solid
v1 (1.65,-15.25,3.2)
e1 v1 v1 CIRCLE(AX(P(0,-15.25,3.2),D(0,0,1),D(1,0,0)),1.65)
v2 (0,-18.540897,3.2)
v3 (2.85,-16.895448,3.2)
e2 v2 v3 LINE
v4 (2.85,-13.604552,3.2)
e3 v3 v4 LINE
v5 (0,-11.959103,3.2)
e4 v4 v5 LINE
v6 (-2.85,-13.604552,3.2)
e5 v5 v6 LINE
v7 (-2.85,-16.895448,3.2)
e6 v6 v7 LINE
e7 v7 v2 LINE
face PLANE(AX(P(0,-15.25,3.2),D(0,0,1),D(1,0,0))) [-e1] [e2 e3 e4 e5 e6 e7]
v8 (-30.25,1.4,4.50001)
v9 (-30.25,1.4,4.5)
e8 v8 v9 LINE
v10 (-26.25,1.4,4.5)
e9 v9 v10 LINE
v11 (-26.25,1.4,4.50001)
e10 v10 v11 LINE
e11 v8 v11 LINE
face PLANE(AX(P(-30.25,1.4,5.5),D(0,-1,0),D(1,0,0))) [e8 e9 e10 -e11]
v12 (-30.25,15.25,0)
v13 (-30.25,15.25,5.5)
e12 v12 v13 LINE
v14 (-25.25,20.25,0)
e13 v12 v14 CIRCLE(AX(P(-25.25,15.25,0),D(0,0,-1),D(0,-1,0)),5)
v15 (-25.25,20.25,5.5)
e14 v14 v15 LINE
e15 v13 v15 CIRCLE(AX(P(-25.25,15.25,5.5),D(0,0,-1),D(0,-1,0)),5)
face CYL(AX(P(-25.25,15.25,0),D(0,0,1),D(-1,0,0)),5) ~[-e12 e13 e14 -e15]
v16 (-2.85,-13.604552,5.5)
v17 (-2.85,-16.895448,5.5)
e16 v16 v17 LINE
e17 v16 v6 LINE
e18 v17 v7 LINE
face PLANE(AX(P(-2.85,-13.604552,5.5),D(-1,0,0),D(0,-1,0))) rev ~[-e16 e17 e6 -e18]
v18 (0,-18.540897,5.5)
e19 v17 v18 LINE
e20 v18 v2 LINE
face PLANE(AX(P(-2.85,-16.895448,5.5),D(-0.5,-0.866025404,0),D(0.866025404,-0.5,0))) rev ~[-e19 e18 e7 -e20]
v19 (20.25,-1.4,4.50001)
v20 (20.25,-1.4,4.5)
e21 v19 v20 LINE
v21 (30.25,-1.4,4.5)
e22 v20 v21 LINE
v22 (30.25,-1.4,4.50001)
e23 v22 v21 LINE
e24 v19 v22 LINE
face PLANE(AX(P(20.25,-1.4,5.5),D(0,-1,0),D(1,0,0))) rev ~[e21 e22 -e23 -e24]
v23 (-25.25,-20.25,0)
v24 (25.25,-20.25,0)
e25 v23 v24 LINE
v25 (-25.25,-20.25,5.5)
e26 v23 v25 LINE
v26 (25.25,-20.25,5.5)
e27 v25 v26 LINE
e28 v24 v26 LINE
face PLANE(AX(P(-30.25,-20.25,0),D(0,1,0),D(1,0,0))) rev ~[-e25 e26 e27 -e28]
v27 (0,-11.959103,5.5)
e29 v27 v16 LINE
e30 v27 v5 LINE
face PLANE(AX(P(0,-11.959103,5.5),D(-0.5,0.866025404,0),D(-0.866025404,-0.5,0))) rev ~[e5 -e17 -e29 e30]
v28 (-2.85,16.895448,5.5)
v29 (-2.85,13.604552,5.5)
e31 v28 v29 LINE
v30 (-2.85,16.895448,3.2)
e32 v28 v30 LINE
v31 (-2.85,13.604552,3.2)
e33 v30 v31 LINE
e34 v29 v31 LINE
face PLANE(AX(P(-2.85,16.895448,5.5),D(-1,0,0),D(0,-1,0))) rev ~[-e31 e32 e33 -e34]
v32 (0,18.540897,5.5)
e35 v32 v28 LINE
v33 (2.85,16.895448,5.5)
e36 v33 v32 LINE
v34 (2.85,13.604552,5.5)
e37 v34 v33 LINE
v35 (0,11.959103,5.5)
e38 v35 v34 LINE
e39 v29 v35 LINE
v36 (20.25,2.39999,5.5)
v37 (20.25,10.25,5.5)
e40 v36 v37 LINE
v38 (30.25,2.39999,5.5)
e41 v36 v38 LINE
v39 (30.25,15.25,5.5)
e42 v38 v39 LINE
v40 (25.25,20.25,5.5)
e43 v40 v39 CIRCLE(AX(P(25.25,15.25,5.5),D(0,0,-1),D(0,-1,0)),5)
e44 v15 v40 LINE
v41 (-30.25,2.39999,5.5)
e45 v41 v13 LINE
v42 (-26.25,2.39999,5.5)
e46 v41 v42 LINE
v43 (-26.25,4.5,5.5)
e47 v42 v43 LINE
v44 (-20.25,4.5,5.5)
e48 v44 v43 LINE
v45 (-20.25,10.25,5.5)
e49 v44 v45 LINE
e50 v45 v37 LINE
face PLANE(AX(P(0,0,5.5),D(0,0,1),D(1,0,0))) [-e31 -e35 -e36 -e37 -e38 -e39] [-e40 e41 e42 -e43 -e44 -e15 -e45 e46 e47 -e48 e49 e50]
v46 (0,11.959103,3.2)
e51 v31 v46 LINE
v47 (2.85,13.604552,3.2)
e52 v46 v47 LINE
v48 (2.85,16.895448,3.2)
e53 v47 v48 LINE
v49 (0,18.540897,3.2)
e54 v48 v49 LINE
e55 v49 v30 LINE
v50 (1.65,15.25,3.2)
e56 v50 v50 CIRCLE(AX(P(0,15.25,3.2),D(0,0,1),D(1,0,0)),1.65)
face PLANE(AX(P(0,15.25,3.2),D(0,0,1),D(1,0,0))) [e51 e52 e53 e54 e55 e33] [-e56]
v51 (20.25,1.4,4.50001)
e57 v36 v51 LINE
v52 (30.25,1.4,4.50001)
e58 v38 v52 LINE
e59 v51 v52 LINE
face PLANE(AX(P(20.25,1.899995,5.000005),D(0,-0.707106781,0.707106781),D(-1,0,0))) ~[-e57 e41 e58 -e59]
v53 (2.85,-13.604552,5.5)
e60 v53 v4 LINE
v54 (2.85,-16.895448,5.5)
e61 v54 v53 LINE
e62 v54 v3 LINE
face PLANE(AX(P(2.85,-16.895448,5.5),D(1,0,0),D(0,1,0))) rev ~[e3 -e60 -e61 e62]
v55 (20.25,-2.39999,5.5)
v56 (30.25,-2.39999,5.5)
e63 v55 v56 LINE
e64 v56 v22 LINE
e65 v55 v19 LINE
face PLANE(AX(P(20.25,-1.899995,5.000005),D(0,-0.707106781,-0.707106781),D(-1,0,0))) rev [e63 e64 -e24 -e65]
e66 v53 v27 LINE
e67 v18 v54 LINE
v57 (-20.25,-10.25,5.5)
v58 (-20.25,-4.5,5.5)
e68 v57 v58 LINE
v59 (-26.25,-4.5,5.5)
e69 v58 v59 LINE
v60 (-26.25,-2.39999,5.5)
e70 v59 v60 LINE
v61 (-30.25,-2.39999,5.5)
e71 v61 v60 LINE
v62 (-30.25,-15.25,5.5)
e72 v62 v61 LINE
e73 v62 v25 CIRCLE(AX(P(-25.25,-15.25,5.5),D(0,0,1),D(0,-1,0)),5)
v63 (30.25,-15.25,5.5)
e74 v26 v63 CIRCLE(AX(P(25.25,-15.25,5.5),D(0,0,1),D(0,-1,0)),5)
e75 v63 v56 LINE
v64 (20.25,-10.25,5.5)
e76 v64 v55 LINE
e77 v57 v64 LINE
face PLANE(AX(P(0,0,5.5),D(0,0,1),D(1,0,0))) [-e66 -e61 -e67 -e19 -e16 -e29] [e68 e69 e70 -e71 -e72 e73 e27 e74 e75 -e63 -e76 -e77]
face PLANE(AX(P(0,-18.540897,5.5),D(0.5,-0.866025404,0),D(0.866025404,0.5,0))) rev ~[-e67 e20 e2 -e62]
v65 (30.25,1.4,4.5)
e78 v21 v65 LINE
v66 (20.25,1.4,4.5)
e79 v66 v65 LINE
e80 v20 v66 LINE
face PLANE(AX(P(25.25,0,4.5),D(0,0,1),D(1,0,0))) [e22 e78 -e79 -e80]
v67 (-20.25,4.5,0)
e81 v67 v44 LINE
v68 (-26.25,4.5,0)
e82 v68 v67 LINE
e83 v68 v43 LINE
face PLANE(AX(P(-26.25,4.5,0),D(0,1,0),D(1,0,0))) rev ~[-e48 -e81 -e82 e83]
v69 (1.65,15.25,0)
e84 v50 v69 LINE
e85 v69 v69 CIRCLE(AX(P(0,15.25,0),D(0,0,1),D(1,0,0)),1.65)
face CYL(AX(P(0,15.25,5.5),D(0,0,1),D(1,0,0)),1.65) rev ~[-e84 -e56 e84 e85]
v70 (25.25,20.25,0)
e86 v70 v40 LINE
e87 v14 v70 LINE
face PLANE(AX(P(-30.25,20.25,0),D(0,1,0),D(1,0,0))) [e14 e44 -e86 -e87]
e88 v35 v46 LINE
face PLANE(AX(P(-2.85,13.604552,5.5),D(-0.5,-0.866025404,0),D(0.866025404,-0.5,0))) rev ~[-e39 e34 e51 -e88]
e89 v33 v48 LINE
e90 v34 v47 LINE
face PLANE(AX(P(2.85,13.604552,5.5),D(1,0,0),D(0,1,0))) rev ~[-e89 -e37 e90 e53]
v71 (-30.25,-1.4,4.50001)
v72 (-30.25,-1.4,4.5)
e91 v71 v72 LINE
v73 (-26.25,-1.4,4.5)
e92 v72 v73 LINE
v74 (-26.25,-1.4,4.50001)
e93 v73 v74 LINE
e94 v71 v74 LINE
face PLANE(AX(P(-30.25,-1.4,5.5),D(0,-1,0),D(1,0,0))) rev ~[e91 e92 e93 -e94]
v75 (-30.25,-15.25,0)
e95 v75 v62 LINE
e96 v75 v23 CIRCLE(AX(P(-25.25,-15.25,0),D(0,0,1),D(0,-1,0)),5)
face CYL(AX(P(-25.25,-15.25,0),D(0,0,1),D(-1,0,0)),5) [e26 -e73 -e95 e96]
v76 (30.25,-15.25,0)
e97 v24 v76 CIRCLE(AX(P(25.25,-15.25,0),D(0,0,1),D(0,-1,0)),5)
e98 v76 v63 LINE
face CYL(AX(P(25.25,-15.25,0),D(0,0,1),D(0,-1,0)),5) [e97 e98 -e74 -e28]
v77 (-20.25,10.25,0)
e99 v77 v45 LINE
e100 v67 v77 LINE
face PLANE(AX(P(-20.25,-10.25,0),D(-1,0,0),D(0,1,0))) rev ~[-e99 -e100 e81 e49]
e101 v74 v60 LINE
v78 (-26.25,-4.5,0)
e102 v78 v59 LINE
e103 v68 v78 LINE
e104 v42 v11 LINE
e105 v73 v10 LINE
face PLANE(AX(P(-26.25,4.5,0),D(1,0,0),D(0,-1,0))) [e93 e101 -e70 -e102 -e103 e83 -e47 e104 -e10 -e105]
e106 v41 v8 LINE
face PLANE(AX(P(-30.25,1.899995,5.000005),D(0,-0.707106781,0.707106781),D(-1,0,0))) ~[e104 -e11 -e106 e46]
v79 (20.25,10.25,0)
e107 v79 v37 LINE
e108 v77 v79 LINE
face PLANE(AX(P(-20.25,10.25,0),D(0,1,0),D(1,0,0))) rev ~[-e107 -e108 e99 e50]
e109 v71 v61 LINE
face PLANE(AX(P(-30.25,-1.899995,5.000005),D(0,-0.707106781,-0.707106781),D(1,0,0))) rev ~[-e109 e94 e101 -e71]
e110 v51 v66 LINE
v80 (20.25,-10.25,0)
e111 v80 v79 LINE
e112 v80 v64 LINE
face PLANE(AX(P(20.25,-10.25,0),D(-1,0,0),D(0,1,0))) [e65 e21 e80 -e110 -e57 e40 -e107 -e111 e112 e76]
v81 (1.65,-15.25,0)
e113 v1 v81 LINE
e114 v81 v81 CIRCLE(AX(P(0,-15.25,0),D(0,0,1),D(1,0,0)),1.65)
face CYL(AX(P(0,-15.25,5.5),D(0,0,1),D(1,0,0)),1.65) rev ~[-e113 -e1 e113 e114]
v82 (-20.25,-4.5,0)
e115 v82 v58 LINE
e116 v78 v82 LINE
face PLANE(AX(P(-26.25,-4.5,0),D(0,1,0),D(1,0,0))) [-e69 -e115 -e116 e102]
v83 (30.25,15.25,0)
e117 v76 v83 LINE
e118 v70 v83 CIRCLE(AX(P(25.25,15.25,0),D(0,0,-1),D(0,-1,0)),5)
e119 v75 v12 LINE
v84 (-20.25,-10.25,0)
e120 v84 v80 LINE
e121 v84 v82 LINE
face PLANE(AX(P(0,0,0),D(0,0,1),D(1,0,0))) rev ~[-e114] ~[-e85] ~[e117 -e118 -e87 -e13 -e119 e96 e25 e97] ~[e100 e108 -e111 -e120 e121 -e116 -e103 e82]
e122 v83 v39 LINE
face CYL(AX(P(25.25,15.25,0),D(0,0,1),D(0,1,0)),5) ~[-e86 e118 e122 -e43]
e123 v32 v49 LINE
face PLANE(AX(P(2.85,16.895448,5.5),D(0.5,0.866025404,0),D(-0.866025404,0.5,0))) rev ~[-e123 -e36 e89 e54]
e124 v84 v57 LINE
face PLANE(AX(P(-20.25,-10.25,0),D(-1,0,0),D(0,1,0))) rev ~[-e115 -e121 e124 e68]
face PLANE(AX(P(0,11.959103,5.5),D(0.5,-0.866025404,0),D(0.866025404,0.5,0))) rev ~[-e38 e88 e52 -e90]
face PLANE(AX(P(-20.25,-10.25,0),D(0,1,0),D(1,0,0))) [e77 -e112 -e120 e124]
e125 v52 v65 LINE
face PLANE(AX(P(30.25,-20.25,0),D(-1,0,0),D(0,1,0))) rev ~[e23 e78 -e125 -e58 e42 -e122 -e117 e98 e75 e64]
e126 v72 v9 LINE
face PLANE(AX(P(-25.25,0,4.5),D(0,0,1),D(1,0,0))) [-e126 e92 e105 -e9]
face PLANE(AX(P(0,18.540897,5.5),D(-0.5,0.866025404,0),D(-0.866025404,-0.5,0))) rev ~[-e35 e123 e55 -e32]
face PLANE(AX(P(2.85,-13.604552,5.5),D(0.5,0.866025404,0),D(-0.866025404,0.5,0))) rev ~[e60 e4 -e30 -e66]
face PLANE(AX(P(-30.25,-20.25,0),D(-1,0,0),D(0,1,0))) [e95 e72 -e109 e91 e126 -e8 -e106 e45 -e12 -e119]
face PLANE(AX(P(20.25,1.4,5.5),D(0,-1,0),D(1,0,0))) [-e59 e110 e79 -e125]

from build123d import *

# Parameters (mm, degrees)
F0_W     = 60.5
F0_H     = 40.5
F0_W_2   = 40.5
F0_H_2   = 20.5
F1_DEPTH = 5.5
F2_W     = 10
F2_H     = 2.8
F3_DEPTH = 1
F4_R     = 1.65
F5_DEPTH = 25
F6_W     = 6
F6_H     = 9
F7_DEPTH = 25
F9_DEPTH = 2.3
F10_SIZE = 0.99999
F11_R    = 5


# Not quite as in the source:
# - a fillet or chamfer is up to 0.001 mm smaller than in the source, because OpenCascade refuses the exact size


with BuildPart() as f1:
    # F0 (on Top) → F1 (new body)
    with BuildSketch(Plane.XY):
        Rectangle(F0_W, F0_H)
        Rectangle(F0_W_2, F0_H_2, mode=Mode.SUBTRACT)
    extrude(amount=F1_DEPTH)

    # F2 (on face) → F3 (cut)
    with BuildSketch(Plane.XY.offset(5.5)):
        with Locations((-25.25, 0)):
            Rectangle(F2_W, F2_H)
        with Locations((25.25, 0)):
            Rectangle(F2_W, F2_H)
    extrude(amount=-F3_DEPTH, mode=Mode.SUBTRACT)

    # F4 (on face) → F5 (cut)
    with BuildSketch(Plane.XY.offset(5.5)):
        with Locations((0, 15.25)):
            Circle(F4_R)
        with Locations((0, -15.25)):
            Circle(F4_R)
    extrude(amount=-F5_DEPTH, mode=Mode.SUBTRACT)

    # F6 (on face) → F7 (cut)
    with BuildSketch(Plane(origin=(0, 0, 0), x_dir=(1, 0, 0), z_dir=(0, 0, -1))):
        with Locations((-23.25, 0)):
            Rectangle(F6_W, F6_H)
    extrude(amount=-F7_DEPTH, mode=Mode.SUBTRACT)

    # F8 (on face) → F9 (cut)
    with BuildSketch(Plane.XY.offset(5.5)):
        Polygon((2.85, 13.6045517328), (2.85, 16.8954482672), (0, 18.5408965344), (-2.85, 16.8954482672), (-2.85, 13.6045517328), (0, 11.9591034656), align=None)
        Polygon((-2.85, -16.8954482672), (0, -18.5408965344), (2.85, -16.8954482672), (2.85, -13.6045517328), (0, -11.9591034656), (-2.85, -13.6045517328), align=None)
    extrude(amount=-F9_DEPTH, mode=Mode.SUBTRACT)

    # F10 (size 1 in the source; OpenCascade refuses exactly that, so slightly less here)
    f10_edges = [f1.edges().sort_by_distance(p)[0] for p in [
        (25.25, 1.4, 5.5),
        (25.25, -1.4, 5.5),
        (-28.25, 1.4, 5.5),
        (-28.25, -1.4, 5.5),
    ]]
    chamfer(f10_edges, length=F10_SIZE)

    # F11
    f11_edges = [f1.edges().sort_by_distance(p)[0] for p in [
        (30.25, 20.25, 2.75),
        (30.25, -20.25, 2.75),
        (-30.25, -20.25, 2.75),
        (-30.25, 20.25, 2.75),
    ]]
    fillet(f11_edges, radius=F11_R)


solid = f1.part
